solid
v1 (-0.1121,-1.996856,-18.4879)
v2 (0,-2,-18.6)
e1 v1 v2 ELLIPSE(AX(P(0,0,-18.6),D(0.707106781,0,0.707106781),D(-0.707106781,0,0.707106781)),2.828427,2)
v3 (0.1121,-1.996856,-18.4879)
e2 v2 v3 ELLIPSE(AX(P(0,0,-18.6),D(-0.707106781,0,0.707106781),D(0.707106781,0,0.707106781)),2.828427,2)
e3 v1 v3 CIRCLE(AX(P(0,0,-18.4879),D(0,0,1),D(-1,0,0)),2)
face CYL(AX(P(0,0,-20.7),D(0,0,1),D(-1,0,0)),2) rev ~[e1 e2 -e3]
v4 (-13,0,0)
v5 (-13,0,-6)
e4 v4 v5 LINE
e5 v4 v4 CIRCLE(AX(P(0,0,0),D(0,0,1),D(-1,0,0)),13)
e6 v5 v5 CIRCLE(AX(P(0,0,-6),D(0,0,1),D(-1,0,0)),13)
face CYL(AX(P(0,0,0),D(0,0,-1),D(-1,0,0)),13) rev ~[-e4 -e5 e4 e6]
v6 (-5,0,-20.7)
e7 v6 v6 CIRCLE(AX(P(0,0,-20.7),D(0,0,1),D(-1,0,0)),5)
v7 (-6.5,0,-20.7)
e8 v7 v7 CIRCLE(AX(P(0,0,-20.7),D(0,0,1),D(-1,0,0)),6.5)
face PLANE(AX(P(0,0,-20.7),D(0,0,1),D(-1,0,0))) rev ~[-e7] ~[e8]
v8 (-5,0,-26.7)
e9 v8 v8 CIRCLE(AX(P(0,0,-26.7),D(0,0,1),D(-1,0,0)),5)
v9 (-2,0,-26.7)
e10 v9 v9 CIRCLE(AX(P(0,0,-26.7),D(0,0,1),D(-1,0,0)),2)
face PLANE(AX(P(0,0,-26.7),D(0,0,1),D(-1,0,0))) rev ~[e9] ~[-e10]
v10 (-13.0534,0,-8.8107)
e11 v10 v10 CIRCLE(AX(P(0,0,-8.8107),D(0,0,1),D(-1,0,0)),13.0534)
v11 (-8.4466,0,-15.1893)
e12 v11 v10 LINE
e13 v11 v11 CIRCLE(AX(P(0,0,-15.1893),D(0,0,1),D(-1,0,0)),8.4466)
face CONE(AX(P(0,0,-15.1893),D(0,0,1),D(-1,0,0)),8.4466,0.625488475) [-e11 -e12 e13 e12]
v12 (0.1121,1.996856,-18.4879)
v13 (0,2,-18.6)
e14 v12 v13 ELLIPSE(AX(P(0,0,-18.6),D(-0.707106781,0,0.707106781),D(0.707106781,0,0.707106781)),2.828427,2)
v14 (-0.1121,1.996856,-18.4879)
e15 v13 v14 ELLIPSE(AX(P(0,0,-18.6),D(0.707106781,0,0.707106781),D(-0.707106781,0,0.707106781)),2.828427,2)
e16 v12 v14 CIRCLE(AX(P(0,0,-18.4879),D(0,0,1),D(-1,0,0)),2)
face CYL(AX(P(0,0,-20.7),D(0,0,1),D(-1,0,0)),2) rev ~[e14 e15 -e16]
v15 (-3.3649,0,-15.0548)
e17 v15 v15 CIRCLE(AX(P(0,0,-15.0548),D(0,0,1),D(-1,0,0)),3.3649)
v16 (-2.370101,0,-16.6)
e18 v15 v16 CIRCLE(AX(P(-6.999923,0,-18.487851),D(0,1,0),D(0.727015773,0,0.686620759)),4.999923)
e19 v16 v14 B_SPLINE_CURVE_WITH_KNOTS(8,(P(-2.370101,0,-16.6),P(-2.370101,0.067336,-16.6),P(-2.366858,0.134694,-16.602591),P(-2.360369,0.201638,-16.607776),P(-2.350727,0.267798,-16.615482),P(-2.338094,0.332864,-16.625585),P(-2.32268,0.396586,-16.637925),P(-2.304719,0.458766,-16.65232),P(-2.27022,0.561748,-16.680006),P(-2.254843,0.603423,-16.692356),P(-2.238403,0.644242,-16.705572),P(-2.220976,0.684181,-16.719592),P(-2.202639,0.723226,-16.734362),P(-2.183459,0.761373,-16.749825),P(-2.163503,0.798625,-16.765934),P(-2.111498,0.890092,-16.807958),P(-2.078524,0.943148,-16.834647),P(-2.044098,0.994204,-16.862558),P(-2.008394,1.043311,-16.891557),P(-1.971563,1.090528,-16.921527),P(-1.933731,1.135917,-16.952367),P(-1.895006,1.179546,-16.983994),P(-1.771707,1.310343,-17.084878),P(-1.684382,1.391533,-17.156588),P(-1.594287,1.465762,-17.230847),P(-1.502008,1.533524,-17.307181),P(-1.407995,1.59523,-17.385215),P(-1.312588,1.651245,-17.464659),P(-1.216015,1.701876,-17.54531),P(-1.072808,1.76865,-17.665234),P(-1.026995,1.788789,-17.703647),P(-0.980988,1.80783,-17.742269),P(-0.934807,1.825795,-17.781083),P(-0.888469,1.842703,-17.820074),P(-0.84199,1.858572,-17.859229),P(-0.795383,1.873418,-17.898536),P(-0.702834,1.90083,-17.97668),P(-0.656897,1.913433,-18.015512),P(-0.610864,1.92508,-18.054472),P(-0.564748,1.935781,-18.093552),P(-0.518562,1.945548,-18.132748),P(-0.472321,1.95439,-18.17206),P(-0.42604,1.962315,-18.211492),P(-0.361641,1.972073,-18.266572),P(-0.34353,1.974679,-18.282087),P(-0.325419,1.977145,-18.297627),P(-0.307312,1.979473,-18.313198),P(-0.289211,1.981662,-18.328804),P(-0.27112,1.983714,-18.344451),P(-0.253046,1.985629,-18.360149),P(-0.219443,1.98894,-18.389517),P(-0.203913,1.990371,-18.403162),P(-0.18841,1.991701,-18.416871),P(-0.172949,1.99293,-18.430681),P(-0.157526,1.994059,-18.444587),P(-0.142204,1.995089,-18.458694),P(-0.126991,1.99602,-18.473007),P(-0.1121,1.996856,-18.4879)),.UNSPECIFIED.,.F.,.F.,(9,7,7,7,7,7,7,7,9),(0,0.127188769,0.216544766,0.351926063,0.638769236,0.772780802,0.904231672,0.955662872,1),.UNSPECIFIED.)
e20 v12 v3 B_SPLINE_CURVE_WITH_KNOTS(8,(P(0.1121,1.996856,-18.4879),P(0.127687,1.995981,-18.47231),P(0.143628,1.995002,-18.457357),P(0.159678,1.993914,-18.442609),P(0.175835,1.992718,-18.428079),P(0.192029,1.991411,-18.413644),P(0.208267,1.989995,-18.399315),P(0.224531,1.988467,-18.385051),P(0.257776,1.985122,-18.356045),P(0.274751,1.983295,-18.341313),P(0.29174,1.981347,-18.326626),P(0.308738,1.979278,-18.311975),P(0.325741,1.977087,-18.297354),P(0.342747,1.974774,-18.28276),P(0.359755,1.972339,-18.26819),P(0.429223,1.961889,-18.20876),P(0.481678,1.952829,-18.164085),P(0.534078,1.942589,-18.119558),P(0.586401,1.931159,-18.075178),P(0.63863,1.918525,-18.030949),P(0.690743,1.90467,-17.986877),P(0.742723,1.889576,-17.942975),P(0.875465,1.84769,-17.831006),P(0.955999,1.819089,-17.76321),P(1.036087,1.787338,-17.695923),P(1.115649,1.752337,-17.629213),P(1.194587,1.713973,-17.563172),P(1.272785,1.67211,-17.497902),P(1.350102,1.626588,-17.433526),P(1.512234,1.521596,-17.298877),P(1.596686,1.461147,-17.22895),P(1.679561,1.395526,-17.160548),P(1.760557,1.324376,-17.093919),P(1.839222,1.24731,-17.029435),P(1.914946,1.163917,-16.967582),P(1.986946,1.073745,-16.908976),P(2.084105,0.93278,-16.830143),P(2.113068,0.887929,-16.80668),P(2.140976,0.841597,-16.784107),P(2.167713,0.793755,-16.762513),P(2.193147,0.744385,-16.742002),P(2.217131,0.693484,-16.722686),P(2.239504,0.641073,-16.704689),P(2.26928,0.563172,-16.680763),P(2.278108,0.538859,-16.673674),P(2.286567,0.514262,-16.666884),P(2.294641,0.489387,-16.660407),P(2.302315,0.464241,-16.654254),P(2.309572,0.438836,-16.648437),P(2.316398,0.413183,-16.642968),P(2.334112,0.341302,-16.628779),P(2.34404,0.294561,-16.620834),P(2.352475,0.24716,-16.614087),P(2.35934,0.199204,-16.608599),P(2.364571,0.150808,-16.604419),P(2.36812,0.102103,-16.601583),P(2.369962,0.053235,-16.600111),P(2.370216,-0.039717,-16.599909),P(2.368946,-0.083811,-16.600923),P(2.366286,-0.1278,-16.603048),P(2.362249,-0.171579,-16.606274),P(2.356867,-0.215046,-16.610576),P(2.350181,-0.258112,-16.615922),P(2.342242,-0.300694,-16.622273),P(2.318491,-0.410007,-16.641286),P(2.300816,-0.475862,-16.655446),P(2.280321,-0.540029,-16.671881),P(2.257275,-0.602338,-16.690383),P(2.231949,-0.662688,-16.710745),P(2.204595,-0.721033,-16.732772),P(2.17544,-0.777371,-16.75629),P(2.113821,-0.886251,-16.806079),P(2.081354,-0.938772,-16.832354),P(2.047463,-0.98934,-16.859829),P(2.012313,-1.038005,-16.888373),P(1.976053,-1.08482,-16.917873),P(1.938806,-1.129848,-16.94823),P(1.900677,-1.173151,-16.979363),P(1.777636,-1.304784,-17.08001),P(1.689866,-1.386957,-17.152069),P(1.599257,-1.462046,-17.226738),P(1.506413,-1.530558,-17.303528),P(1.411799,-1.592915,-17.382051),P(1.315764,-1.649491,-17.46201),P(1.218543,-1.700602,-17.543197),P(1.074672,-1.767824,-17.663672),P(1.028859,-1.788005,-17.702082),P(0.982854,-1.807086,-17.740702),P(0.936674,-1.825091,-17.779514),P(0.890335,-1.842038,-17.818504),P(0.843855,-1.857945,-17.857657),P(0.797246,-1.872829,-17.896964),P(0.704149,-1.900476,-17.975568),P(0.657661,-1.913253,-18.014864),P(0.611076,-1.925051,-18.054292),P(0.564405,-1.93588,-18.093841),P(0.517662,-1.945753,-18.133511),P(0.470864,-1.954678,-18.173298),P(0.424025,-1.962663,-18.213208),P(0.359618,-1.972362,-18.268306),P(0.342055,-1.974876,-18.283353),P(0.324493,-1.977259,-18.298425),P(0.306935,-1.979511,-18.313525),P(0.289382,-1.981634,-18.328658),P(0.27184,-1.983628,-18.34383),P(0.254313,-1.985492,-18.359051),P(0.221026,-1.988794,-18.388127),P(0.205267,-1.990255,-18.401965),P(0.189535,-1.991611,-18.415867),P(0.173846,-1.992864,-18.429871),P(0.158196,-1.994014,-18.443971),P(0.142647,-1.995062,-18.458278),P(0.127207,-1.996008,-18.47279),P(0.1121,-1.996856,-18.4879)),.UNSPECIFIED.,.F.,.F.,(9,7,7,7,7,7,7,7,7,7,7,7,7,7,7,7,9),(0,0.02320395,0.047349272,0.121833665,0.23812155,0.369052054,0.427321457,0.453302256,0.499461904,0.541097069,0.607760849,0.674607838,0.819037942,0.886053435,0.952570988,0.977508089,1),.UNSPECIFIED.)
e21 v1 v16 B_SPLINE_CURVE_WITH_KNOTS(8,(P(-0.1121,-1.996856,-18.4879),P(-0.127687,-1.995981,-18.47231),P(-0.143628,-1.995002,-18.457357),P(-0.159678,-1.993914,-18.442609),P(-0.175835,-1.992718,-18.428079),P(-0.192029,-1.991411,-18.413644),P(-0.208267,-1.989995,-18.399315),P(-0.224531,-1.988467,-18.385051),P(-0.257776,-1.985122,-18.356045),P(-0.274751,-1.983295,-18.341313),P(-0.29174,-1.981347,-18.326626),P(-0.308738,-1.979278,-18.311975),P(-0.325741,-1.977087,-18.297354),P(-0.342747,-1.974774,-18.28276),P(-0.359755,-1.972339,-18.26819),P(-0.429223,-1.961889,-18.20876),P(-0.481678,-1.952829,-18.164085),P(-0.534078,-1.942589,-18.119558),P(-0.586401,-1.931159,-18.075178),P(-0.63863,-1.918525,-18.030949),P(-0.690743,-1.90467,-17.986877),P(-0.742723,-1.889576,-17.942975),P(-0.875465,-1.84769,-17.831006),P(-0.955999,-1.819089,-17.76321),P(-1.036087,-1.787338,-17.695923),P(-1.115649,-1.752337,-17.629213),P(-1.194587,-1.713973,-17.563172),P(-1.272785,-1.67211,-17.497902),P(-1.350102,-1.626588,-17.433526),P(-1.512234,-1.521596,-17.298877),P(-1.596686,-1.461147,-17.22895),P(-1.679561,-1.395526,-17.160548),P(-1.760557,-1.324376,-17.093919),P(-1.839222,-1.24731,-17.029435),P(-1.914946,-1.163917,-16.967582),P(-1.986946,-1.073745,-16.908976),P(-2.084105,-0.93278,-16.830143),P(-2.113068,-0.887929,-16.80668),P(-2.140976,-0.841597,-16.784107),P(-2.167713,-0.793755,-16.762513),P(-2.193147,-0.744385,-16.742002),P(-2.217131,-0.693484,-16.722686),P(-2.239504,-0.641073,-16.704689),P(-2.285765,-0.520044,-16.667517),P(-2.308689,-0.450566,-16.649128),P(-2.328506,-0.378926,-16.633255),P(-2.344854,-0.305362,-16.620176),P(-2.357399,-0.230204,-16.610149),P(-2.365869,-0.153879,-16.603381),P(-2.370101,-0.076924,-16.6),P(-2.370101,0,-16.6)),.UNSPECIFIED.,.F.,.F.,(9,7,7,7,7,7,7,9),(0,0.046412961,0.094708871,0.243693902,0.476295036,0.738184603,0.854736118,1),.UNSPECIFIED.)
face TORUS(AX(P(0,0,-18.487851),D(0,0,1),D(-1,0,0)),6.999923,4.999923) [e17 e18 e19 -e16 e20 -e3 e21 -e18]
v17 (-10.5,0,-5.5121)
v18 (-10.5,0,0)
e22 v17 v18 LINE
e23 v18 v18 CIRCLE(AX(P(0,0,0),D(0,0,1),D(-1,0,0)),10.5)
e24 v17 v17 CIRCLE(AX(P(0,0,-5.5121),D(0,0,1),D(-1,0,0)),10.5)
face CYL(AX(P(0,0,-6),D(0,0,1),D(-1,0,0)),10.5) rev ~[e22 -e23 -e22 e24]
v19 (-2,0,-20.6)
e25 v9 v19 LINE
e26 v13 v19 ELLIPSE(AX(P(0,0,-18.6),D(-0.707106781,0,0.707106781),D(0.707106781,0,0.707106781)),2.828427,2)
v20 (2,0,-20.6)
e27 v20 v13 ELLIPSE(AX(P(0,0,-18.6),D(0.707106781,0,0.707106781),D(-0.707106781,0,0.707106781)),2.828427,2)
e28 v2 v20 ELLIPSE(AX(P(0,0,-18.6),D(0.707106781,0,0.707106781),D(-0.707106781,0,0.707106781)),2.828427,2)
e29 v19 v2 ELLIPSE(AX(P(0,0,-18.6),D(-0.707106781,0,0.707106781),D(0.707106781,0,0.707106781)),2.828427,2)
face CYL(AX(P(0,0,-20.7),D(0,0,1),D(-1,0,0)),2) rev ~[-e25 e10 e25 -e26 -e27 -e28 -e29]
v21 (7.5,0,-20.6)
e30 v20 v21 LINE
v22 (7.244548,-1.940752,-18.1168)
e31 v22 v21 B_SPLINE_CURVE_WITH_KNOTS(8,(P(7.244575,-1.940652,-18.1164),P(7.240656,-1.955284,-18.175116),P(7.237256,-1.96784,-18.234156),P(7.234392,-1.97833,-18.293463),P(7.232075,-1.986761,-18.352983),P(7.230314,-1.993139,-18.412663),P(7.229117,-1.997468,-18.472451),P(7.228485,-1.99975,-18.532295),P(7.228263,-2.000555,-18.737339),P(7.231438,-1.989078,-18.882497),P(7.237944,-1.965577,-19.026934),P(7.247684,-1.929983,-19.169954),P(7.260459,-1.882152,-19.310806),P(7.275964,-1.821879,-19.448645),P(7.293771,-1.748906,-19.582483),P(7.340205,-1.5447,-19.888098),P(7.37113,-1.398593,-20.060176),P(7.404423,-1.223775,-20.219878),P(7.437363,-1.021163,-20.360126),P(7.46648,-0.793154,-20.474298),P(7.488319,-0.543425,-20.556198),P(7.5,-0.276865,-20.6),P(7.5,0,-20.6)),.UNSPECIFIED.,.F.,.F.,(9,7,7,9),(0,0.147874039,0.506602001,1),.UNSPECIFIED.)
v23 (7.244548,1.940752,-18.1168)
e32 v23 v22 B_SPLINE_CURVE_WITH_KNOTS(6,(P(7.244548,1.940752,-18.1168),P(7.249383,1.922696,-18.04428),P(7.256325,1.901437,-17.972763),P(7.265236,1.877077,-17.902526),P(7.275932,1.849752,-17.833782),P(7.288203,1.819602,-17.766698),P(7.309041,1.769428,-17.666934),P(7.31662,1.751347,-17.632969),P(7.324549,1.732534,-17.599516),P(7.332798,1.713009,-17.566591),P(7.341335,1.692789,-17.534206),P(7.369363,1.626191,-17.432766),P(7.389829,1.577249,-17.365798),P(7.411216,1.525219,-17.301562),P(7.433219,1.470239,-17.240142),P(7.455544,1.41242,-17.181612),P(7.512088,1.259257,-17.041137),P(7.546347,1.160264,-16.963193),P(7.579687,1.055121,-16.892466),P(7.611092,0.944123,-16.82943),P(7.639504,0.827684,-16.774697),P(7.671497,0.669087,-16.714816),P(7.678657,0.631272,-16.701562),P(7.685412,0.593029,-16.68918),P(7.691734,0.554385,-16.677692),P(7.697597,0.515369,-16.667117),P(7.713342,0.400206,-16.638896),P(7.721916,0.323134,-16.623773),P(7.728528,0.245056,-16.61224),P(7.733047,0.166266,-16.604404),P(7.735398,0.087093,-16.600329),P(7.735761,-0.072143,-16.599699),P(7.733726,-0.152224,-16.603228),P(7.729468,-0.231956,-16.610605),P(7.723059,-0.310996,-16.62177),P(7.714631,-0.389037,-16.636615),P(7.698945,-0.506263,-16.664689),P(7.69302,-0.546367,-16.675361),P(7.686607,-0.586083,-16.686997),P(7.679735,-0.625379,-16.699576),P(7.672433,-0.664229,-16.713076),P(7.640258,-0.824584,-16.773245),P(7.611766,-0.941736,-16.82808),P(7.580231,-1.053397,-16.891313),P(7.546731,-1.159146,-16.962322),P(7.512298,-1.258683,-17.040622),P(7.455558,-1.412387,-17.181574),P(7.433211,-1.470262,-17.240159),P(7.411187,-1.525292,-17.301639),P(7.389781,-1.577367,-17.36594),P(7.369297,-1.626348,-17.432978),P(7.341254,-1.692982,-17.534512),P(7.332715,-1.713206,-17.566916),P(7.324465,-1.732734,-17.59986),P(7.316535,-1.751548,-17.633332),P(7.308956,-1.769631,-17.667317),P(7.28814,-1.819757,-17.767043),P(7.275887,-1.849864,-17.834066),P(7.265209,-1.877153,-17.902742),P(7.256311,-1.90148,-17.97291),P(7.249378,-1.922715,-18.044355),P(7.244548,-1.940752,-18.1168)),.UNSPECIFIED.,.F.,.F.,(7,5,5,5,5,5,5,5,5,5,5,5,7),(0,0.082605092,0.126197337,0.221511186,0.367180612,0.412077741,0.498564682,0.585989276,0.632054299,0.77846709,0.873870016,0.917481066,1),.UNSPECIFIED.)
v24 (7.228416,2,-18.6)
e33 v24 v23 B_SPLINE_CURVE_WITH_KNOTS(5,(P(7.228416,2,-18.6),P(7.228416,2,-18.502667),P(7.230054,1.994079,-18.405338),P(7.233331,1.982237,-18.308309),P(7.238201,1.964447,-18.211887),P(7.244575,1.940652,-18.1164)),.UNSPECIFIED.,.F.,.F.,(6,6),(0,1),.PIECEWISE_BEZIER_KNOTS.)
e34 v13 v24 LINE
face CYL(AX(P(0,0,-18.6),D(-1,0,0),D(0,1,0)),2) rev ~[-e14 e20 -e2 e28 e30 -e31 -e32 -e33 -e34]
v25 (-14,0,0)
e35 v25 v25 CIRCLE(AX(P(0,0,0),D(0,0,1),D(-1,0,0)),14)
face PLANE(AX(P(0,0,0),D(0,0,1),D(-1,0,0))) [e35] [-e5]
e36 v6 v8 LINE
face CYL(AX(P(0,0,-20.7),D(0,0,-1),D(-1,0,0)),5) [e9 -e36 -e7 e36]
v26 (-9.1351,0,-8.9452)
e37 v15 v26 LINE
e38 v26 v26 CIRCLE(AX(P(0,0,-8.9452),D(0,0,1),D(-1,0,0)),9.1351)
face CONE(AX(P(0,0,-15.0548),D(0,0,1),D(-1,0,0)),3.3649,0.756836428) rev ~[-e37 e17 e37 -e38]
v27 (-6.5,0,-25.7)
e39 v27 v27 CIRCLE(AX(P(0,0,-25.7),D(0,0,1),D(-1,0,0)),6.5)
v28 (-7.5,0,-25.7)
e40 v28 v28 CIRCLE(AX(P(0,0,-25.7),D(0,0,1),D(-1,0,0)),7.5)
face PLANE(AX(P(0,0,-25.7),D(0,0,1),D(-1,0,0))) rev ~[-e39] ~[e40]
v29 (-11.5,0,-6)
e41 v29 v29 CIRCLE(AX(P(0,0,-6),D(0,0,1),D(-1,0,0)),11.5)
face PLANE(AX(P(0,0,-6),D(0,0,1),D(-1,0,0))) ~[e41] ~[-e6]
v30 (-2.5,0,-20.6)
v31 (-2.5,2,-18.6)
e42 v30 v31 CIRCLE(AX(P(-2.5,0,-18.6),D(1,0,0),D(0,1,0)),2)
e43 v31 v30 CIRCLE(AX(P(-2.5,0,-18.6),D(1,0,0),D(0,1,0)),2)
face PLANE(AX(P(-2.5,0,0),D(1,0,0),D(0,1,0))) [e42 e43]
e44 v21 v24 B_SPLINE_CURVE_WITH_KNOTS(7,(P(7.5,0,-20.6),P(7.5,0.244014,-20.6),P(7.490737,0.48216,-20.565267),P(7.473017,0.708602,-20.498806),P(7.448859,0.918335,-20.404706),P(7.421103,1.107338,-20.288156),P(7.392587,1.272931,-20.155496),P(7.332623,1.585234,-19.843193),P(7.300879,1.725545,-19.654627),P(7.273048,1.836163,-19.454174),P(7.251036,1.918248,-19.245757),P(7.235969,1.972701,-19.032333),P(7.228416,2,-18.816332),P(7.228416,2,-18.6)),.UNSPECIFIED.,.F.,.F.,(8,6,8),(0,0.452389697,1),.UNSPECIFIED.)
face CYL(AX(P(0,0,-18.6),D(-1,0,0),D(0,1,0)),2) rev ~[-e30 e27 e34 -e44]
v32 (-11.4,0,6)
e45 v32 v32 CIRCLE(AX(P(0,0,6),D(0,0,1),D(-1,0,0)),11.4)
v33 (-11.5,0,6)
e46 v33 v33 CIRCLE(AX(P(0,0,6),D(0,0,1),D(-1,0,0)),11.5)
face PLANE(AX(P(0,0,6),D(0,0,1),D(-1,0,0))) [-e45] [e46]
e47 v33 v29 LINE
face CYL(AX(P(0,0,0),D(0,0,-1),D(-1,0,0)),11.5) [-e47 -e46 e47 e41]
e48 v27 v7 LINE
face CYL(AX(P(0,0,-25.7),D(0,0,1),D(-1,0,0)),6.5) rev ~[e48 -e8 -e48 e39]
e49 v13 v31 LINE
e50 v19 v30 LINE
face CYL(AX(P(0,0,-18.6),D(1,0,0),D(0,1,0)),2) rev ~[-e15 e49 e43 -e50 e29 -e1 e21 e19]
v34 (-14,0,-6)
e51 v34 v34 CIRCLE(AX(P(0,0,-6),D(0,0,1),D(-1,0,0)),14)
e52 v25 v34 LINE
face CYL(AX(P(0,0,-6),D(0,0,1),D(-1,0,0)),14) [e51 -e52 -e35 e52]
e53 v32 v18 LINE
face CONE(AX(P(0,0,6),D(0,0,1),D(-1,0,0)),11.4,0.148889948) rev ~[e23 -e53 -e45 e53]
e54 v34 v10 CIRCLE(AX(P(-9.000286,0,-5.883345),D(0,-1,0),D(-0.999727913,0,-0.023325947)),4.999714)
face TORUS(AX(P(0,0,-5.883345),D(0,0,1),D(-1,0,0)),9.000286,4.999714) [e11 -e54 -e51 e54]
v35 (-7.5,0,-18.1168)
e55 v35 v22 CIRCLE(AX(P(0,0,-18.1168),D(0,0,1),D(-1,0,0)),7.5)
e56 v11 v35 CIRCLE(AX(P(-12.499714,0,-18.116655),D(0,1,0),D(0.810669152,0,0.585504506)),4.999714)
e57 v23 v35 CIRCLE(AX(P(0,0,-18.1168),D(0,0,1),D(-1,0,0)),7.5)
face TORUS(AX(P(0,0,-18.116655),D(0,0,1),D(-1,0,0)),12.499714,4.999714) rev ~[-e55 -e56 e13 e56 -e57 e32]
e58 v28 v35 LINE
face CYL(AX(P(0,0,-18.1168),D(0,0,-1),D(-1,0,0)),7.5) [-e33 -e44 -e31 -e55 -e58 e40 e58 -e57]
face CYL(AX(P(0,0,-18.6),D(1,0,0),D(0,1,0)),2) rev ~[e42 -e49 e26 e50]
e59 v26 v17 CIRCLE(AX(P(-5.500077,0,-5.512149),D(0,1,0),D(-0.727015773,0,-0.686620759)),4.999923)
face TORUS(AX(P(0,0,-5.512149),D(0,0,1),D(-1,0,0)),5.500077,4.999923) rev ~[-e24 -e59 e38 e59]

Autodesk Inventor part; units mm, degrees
ref_plane "YZ Plane" through (0, 0, 0) normal (1, 0, 0) x (0, 1, 0)
ref_plane "XZ Plane" through (0, 0, 0) normal (0, 1, 0) x (-1, 0, 0)
ref_plane "XY Plane" through (0, 0, 0) normal (0, 0, 1) x (1, 0, 0)
sketch "Sketch1" plane through (0, 0, 0) normal (0, 1, 0) x (-1, 0, 0)
  line L0 (0, -27.5114) -> (0, 22.3977)
  line L1 (11.5, -6) -> (10.5, -6)
  line L2 (10.5, -6) -> (10.5, 0)
  line L3 (10.5, 0) -> (11.5, 0)
  line L4 (11.5, 0) -> (11.5, -6)
  line L5 (14, -7.5) -> (10.5, -7.5)
  line L6 (10.5, -5.5121) -> (10.5, -6)
  line L7 (10.5, -6) -> (14, -6)
  line L8 (14, -6) -> (14, -5.8832)
  line L9 (28.1307, 0) -> (-27.0173, 0)
  line L10 (7.5, -25.7) -> (6.5, -25.7)
  line L11 (6.5, -25.7) -> (6.5, -20.7)
  line L12 (6.5, -20.7) -> (7.5, -20.7)
  line L13 (7.5, -20.7) -> (7.5, -25.7)
  line L14 (5, -26.7) -> (2, -26.7)
  line L15 (2, -26.7) -> (2, -20.7)
  line L16 (2, -20.7) -> (5, -20.7)
  line L17 (5, -20.7) -> (5, -26.7)
  line L18 (7.5, -20.7) -> (2, -20.7)
  line L19 (2, -20.7) -> (2, -18.4879)
  line L20 (2, -16.5) -> (7.5, -16.5)
  line L21 (7.5, -18.1168) -> (7.5, -20.7)
  line L22 (3.3649, -15.0548) -> (9.1351, -8.9452)
  line L23 (8.4466, -15.1893) -> (13.0534, -8.8107)
  arc A0 (8.4466, -15.1893) -> (7.5, -18.1168) centre (12.5, -18.1168) ccw
  arc A1 (13.0534, -8.8107) -> (14, -5.8832) centre (9, -5.8832) ccw
  arc A2 (9.1351, -8.9452) -> (10.5, -5.5121) centre (5.5, -5.5121) ccw
  arc A3 (3.3649, -15.0548) -> (2, -18.4879) centre (7, -18.4879) ccw
  line L24 (13, -6) -> (14, -6)
  line L25 (14, -6) -> (14, 0)
  line L26 (14, 0) -> (13, 0)
  line L27 (13, 0) -> (13, -6)
  line L28 (11.5, 0) -> (11.5, 6)
  line L29 (11.5, 6) -> (11.4, 6)
  line L30 (11.4, 6) -> (10.5, 0)
  point P0 (0, 0)
  point P1 (11.5, -6)
  point P2 (13.9986, -6)
  point P3 (10.5, -5.5121)
  dimension "d2" = 1
  dimension "d4" = 1.5
  dimension "d5" = 6
  dimension "d6" = 6.5
  dimension "d7" = 1.5
  dimension "d8" = 1
  dimension "d9" = 4.2
  dimension "d10" = 5
  dimension "d11" = 9
  dimension "d12" = 2
  dimension "d13" = 5
  dimension "d14" = 5
  dimension "d15" = 5
  dimension "d17" = 6
  dimension "d20" = 1
  dimension "d21" = 6
  dimension "d22" = 1.5
  dimension "d23" = 13
  dimension "d28" = 6
  dimension "d29" = 0.1
revolve "Revolution1" add sketch "Sketch1" angle 360 about axis through (0, 0, -27.5114) along (0, 0, 1) contours L7 A1 L23 A0 L21 L12 L18 L16 L19 A3 L22 A2 L2 L1 | L1 L2 L3 L4 | L3 L30 L29 L28 | L27 L9 L25 L8 L7 | L16 L17 L14 L15 | L13 L10 L11 L12
sketch "Sketch2" plane through (0, 0, 0) normal (1, 0, 0) x (0, 1, 0)
  line L0 (5, -26.7) -> (-5, -26.7) construction
  line L1 (0, -26.7) -> (0, -18.4879)
  line L2 (2, -18.4879) -> (-2, -18.4879) construction
  line L3 (5, -20.7) -> (-5, -20.7) construction
  circle A0 centre (0, -18.6) radius 2
  point P0 (0, 0)
  dimension "d18" = 4
  dimension "d19" = 2.1
extrude "Extrusion1" cut sketch "Sketch2" along normal blind 14 and the other way blind 2.5
equation "\"d18\" = ft_D"
equation "\"d19\" = 0.5 * ft_D + tol"
equation "\"d24\" = sv_OD + hw_thickness"
equation "\"d26\" = 0.5 * hw_thickness + 0.5 * ft_D"
equation "\"d2\" = hw_thickness"
equation "\"d4\" = 0.25 * hw_length"
equation "\"d5\" = hw_length"
equation "\"d6\" = 0.5 * sv_OD"
equation "\"d7\" = sv_thickness"
equation "\"d8\" = hw_thickness"
equation "\"d9\" = 1.05 * ft_D"
equation "\"d10\" = 0.833333 * hw_length"
equation "\"d11\" = 1.5 * hw_length"
equation "\"d12\" = 0.5 * ft_D"
equation "\"d13\" = fillet_D"
equation "\"d14\" = fillet_D"
equation "\"d15\" = fillet_D"
equation "\"d17\" = hw_length"
equation "\"d20\" = hw_thickness"
equation "\"d21\" = hw_length"
equation "\"d22\" = lv_thickness"
equation "\"d23\" = 0.5 * lv_OD"
equation "\"d28\" = hw_length"
equation "\"d29\" = tol"
equation "\"lv_OD\" = 26"
equation "\"lv_thickness\" = 1.5"
equation "\"hw_thickness\" = 1"
equation "\"hw_length\" = 6"
equation "\"sv_OD\" = 13"
equation "\"sv_thickness\" = 1.5"
equation "\"ft_D\" = 4"
equation "\"fillet_D\" = 5"
equation "\"tol\" = 0.1"
properties part number "fly_funnel"
